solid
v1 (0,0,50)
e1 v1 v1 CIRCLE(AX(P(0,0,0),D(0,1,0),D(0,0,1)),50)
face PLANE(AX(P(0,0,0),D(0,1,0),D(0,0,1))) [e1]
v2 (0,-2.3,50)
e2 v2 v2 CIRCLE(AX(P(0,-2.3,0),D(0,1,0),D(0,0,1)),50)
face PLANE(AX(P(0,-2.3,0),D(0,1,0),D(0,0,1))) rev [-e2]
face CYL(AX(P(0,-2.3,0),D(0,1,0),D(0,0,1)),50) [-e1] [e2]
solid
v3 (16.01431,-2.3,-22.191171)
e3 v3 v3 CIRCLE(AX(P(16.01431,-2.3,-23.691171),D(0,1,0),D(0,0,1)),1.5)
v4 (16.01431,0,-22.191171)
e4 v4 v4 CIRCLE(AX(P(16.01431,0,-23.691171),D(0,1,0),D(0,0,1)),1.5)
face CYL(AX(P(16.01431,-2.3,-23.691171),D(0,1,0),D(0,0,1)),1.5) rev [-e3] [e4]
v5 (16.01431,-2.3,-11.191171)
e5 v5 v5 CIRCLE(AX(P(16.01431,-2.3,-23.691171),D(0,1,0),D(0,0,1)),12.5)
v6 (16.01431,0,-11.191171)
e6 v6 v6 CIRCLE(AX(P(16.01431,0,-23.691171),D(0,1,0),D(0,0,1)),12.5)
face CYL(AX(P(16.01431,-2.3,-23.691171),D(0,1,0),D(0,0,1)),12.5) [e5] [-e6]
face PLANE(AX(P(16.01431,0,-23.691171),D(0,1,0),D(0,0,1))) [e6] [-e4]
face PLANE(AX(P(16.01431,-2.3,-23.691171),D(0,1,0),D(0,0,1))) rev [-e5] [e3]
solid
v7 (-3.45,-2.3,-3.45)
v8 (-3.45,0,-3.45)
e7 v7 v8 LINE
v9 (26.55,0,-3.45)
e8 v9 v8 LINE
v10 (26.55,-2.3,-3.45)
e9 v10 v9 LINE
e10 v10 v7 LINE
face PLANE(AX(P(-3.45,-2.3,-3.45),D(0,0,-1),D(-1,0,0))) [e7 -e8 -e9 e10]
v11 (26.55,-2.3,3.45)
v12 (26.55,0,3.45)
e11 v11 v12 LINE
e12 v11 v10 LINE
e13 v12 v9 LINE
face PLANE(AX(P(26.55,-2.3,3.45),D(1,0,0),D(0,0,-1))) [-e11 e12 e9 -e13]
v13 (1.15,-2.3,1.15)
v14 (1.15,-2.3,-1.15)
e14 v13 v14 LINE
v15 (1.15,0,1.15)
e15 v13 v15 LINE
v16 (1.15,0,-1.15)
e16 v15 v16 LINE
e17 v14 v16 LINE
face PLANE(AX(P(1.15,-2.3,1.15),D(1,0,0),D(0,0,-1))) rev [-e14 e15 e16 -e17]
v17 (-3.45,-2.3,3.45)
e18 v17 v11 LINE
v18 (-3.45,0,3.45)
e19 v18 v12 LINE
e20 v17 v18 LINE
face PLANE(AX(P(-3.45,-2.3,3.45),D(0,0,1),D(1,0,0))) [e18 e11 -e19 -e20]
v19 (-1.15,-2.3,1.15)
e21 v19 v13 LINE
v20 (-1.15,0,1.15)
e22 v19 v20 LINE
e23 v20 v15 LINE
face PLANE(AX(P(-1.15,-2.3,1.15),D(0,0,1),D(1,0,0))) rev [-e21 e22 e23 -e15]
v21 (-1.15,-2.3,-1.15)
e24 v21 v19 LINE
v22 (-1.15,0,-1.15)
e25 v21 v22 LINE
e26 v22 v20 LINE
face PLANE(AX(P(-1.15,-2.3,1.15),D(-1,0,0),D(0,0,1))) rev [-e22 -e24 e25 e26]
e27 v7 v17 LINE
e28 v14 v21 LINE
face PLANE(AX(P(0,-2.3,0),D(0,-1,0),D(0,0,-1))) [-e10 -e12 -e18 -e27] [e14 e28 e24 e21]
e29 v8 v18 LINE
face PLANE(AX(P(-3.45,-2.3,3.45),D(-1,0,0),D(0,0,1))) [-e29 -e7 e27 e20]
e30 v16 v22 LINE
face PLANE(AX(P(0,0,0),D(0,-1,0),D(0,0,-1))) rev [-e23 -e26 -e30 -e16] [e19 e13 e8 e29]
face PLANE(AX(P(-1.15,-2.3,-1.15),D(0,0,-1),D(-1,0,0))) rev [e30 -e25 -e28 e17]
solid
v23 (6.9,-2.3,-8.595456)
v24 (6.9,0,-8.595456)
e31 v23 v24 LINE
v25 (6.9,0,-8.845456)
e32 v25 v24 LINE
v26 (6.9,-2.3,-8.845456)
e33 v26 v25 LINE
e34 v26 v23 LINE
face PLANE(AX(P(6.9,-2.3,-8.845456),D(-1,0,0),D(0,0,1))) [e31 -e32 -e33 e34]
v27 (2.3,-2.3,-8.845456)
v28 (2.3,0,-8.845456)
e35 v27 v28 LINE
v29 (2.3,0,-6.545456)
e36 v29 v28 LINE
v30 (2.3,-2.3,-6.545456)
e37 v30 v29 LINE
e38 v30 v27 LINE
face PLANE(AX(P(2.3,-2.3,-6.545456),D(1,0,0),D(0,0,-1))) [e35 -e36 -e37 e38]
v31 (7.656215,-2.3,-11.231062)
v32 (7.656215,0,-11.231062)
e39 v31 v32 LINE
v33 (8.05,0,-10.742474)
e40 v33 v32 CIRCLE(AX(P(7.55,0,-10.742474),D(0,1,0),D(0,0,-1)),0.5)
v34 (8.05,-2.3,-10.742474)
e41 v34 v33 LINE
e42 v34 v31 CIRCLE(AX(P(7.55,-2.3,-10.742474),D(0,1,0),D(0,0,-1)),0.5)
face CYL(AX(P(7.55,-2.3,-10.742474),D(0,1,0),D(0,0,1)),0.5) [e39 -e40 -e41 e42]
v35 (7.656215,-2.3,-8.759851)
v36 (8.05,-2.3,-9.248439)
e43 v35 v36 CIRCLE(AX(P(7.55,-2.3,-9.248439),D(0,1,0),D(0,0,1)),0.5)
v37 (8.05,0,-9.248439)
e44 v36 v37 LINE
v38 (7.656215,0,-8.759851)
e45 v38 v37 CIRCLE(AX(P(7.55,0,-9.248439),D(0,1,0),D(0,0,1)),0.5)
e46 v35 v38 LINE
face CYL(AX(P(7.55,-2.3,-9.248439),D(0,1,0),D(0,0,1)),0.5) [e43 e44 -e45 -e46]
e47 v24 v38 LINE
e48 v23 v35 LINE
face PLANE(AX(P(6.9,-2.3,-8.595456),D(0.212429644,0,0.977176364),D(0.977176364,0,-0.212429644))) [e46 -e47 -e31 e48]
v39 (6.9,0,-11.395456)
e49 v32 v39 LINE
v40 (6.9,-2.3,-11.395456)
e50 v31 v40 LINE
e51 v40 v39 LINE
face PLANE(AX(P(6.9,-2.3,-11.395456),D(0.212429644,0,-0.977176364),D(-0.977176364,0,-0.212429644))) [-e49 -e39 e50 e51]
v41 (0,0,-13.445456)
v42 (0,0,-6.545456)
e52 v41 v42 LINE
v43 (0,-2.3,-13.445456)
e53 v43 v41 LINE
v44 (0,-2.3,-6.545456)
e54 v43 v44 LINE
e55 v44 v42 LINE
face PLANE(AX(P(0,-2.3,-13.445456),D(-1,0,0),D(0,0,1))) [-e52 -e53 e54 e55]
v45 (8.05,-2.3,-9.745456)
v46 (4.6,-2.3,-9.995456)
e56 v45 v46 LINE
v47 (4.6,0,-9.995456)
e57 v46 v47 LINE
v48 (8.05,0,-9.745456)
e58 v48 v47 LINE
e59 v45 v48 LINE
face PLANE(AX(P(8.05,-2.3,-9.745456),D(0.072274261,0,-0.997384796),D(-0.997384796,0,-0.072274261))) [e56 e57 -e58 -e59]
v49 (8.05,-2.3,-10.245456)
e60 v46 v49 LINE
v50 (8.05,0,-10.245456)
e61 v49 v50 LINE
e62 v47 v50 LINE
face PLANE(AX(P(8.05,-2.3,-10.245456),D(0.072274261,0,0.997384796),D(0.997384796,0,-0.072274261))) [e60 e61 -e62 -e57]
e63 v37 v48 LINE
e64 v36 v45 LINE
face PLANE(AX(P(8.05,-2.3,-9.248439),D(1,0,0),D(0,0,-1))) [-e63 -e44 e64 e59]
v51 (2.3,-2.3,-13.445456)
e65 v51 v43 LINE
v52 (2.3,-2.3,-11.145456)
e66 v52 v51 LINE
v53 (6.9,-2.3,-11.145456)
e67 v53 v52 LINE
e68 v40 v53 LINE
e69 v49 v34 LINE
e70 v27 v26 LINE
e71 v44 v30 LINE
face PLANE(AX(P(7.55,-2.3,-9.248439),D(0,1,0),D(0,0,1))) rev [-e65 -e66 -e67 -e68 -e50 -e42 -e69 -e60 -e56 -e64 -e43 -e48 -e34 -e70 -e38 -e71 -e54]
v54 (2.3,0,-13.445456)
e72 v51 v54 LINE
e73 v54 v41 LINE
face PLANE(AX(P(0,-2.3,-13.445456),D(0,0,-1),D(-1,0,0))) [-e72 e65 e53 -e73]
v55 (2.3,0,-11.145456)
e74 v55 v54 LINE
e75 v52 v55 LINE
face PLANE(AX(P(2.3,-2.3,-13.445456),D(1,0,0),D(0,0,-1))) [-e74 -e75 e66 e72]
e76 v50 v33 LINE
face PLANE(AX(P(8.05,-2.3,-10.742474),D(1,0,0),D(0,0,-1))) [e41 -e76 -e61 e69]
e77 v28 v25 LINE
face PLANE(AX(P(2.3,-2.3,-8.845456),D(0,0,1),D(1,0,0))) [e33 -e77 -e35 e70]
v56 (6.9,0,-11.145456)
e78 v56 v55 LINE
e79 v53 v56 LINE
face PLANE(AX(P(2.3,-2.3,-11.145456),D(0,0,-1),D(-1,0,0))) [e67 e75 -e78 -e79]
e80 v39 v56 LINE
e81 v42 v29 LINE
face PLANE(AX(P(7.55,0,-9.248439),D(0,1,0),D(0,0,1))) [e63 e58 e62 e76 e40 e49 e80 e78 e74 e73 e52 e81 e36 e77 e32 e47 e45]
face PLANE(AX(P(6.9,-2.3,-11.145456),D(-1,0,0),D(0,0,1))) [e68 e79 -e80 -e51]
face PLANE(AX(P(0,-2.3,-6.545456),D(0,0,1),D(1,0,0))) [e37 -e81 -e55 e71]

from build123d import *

# Parameters (mm, degrees)
SKETCH1_W          = 30
SKETCH1_H          = 6.9
SKETCH1_W_2        = 2.3
SKETCH1_H_2        = 2.3
BASE_FLANGE1_DEPTH = 2.3
BASE_FLANGE2_DEPTH = 2.3
SKETCH9_R          = 12.5
SKETCH9_R_2        = 1.5
BASE_FLANGE3_DEPTH = 2.3
SKETCH10_R         = 50
BASE_FLANGE4_DEPTH = 2.3


# Sheet-metal steps are written as plain solids
with BuildPart() as part:
    # Sketch1 → Base-Flange1 (new body)
    with BuildSketch(Plane(origin=(0, 0, 0), x_dir=(1, 0, 0), z_dir=(0, 1, 0))):
        with Locations((11.55, 0)):
            Rectangle(SKETCH1_W, SKETCH1_H)
        Rectangle(SKETCH1_W_2, SKETCH1_H_2, mode=Mode.SUBTRACT)
    extrude(amount=-BASE_FLANGE1_DEPTH)


with BuildPart() as body_2:
    # Sketch6 → Base-Flange2 (new body)
    with BuildSketch(Plane(origin=(0, 0, 0), x_dir=(1, 0, 0), z_dir=(0, 1, 0))):
        with BuildLine():
            Line((0, 13.445456408), (2.3, 13.445456408))
            Line((2.3, 13.445456408), (2.3, 11.145456408))
            Line((2.3, 11.145456408), (6.9, 11.145456408))
            Line((6.9, 11.145456408), (6.9, 11.395456408))
            Line((6.9, 11.395456408), (7.656214822, 11.231061881))
            ThreePointArc((7.656214822, 11.231061881), (7.939298992, 11.056235224), (8.05, 10.742473699))
            Line((8.05, 10.742473699), (8.05, 10.245456408))
            Line((8.05, 10.245456408), (4.6, 9.995456408))
            Line((4.6, 9.995456408), (8.05, 9.745456408))
            Line((8.05, 9.745456408), (8.05, 9.248439116))
            ThreePointArc((8.05, 9.248439116), (7.939298992, 8.934677592), (7.656214822, 8.759850934))
            Line((7.656214822, 8.759850934), (6.9, 8.595456408))
            Line((6.9, 8.595456408), (6.9, 8.845456408))
            Line((6.9, 8.845456408), (2.3, 8.845456408))
            Line((2.3, 8.845456408), (2.3, 6.545456408))
            Line((2.3, 6.545456408), (0, 6.545456408))
            Line((0, 6.545456408), (0, 13.445456408))
        make_face()
    extrude(amount=-BASE_FLANGE2_DEPTH)


with BuildPart() as body_3:
    # Sketch9 → Base-Flange3 (new body)
    with BuildSketch(Plane(origin=(0, 0, 0), x_dir=(1, 0, 0), z_dir=(0, 1, 0))):
        with Locations(Location((16.014309717, 23.691171103, 0), (0, 0, 270))):
            Circle(SKETCH9_R)
        with Locations(Location((16.014309717, 23.691171103, 0), (0, 0, 270))):
            Circle(SKETCH9_R_2, mode=Mode.SUBTRACT)
    extrude(amount=-BASE_FLANGE3_DEPTH)


with BuildPart() as body_4:
    # Sketch10 → Base-Flange4 (new body)
    with BuildSketch(Plane(origin=(0, 0, 0), x_dir=(1, 0, 0), z_dir=(0, 1, 0))):
        with Locations(Location((0, 0, 0), (0, 0, 270))):
            Circle(SKETCH10_R)
    extrude(amount=-BASE_FLANGE4_DEPTH)


solid = Compound([part.part, body_2.part, body_3.part, body_4.part])
